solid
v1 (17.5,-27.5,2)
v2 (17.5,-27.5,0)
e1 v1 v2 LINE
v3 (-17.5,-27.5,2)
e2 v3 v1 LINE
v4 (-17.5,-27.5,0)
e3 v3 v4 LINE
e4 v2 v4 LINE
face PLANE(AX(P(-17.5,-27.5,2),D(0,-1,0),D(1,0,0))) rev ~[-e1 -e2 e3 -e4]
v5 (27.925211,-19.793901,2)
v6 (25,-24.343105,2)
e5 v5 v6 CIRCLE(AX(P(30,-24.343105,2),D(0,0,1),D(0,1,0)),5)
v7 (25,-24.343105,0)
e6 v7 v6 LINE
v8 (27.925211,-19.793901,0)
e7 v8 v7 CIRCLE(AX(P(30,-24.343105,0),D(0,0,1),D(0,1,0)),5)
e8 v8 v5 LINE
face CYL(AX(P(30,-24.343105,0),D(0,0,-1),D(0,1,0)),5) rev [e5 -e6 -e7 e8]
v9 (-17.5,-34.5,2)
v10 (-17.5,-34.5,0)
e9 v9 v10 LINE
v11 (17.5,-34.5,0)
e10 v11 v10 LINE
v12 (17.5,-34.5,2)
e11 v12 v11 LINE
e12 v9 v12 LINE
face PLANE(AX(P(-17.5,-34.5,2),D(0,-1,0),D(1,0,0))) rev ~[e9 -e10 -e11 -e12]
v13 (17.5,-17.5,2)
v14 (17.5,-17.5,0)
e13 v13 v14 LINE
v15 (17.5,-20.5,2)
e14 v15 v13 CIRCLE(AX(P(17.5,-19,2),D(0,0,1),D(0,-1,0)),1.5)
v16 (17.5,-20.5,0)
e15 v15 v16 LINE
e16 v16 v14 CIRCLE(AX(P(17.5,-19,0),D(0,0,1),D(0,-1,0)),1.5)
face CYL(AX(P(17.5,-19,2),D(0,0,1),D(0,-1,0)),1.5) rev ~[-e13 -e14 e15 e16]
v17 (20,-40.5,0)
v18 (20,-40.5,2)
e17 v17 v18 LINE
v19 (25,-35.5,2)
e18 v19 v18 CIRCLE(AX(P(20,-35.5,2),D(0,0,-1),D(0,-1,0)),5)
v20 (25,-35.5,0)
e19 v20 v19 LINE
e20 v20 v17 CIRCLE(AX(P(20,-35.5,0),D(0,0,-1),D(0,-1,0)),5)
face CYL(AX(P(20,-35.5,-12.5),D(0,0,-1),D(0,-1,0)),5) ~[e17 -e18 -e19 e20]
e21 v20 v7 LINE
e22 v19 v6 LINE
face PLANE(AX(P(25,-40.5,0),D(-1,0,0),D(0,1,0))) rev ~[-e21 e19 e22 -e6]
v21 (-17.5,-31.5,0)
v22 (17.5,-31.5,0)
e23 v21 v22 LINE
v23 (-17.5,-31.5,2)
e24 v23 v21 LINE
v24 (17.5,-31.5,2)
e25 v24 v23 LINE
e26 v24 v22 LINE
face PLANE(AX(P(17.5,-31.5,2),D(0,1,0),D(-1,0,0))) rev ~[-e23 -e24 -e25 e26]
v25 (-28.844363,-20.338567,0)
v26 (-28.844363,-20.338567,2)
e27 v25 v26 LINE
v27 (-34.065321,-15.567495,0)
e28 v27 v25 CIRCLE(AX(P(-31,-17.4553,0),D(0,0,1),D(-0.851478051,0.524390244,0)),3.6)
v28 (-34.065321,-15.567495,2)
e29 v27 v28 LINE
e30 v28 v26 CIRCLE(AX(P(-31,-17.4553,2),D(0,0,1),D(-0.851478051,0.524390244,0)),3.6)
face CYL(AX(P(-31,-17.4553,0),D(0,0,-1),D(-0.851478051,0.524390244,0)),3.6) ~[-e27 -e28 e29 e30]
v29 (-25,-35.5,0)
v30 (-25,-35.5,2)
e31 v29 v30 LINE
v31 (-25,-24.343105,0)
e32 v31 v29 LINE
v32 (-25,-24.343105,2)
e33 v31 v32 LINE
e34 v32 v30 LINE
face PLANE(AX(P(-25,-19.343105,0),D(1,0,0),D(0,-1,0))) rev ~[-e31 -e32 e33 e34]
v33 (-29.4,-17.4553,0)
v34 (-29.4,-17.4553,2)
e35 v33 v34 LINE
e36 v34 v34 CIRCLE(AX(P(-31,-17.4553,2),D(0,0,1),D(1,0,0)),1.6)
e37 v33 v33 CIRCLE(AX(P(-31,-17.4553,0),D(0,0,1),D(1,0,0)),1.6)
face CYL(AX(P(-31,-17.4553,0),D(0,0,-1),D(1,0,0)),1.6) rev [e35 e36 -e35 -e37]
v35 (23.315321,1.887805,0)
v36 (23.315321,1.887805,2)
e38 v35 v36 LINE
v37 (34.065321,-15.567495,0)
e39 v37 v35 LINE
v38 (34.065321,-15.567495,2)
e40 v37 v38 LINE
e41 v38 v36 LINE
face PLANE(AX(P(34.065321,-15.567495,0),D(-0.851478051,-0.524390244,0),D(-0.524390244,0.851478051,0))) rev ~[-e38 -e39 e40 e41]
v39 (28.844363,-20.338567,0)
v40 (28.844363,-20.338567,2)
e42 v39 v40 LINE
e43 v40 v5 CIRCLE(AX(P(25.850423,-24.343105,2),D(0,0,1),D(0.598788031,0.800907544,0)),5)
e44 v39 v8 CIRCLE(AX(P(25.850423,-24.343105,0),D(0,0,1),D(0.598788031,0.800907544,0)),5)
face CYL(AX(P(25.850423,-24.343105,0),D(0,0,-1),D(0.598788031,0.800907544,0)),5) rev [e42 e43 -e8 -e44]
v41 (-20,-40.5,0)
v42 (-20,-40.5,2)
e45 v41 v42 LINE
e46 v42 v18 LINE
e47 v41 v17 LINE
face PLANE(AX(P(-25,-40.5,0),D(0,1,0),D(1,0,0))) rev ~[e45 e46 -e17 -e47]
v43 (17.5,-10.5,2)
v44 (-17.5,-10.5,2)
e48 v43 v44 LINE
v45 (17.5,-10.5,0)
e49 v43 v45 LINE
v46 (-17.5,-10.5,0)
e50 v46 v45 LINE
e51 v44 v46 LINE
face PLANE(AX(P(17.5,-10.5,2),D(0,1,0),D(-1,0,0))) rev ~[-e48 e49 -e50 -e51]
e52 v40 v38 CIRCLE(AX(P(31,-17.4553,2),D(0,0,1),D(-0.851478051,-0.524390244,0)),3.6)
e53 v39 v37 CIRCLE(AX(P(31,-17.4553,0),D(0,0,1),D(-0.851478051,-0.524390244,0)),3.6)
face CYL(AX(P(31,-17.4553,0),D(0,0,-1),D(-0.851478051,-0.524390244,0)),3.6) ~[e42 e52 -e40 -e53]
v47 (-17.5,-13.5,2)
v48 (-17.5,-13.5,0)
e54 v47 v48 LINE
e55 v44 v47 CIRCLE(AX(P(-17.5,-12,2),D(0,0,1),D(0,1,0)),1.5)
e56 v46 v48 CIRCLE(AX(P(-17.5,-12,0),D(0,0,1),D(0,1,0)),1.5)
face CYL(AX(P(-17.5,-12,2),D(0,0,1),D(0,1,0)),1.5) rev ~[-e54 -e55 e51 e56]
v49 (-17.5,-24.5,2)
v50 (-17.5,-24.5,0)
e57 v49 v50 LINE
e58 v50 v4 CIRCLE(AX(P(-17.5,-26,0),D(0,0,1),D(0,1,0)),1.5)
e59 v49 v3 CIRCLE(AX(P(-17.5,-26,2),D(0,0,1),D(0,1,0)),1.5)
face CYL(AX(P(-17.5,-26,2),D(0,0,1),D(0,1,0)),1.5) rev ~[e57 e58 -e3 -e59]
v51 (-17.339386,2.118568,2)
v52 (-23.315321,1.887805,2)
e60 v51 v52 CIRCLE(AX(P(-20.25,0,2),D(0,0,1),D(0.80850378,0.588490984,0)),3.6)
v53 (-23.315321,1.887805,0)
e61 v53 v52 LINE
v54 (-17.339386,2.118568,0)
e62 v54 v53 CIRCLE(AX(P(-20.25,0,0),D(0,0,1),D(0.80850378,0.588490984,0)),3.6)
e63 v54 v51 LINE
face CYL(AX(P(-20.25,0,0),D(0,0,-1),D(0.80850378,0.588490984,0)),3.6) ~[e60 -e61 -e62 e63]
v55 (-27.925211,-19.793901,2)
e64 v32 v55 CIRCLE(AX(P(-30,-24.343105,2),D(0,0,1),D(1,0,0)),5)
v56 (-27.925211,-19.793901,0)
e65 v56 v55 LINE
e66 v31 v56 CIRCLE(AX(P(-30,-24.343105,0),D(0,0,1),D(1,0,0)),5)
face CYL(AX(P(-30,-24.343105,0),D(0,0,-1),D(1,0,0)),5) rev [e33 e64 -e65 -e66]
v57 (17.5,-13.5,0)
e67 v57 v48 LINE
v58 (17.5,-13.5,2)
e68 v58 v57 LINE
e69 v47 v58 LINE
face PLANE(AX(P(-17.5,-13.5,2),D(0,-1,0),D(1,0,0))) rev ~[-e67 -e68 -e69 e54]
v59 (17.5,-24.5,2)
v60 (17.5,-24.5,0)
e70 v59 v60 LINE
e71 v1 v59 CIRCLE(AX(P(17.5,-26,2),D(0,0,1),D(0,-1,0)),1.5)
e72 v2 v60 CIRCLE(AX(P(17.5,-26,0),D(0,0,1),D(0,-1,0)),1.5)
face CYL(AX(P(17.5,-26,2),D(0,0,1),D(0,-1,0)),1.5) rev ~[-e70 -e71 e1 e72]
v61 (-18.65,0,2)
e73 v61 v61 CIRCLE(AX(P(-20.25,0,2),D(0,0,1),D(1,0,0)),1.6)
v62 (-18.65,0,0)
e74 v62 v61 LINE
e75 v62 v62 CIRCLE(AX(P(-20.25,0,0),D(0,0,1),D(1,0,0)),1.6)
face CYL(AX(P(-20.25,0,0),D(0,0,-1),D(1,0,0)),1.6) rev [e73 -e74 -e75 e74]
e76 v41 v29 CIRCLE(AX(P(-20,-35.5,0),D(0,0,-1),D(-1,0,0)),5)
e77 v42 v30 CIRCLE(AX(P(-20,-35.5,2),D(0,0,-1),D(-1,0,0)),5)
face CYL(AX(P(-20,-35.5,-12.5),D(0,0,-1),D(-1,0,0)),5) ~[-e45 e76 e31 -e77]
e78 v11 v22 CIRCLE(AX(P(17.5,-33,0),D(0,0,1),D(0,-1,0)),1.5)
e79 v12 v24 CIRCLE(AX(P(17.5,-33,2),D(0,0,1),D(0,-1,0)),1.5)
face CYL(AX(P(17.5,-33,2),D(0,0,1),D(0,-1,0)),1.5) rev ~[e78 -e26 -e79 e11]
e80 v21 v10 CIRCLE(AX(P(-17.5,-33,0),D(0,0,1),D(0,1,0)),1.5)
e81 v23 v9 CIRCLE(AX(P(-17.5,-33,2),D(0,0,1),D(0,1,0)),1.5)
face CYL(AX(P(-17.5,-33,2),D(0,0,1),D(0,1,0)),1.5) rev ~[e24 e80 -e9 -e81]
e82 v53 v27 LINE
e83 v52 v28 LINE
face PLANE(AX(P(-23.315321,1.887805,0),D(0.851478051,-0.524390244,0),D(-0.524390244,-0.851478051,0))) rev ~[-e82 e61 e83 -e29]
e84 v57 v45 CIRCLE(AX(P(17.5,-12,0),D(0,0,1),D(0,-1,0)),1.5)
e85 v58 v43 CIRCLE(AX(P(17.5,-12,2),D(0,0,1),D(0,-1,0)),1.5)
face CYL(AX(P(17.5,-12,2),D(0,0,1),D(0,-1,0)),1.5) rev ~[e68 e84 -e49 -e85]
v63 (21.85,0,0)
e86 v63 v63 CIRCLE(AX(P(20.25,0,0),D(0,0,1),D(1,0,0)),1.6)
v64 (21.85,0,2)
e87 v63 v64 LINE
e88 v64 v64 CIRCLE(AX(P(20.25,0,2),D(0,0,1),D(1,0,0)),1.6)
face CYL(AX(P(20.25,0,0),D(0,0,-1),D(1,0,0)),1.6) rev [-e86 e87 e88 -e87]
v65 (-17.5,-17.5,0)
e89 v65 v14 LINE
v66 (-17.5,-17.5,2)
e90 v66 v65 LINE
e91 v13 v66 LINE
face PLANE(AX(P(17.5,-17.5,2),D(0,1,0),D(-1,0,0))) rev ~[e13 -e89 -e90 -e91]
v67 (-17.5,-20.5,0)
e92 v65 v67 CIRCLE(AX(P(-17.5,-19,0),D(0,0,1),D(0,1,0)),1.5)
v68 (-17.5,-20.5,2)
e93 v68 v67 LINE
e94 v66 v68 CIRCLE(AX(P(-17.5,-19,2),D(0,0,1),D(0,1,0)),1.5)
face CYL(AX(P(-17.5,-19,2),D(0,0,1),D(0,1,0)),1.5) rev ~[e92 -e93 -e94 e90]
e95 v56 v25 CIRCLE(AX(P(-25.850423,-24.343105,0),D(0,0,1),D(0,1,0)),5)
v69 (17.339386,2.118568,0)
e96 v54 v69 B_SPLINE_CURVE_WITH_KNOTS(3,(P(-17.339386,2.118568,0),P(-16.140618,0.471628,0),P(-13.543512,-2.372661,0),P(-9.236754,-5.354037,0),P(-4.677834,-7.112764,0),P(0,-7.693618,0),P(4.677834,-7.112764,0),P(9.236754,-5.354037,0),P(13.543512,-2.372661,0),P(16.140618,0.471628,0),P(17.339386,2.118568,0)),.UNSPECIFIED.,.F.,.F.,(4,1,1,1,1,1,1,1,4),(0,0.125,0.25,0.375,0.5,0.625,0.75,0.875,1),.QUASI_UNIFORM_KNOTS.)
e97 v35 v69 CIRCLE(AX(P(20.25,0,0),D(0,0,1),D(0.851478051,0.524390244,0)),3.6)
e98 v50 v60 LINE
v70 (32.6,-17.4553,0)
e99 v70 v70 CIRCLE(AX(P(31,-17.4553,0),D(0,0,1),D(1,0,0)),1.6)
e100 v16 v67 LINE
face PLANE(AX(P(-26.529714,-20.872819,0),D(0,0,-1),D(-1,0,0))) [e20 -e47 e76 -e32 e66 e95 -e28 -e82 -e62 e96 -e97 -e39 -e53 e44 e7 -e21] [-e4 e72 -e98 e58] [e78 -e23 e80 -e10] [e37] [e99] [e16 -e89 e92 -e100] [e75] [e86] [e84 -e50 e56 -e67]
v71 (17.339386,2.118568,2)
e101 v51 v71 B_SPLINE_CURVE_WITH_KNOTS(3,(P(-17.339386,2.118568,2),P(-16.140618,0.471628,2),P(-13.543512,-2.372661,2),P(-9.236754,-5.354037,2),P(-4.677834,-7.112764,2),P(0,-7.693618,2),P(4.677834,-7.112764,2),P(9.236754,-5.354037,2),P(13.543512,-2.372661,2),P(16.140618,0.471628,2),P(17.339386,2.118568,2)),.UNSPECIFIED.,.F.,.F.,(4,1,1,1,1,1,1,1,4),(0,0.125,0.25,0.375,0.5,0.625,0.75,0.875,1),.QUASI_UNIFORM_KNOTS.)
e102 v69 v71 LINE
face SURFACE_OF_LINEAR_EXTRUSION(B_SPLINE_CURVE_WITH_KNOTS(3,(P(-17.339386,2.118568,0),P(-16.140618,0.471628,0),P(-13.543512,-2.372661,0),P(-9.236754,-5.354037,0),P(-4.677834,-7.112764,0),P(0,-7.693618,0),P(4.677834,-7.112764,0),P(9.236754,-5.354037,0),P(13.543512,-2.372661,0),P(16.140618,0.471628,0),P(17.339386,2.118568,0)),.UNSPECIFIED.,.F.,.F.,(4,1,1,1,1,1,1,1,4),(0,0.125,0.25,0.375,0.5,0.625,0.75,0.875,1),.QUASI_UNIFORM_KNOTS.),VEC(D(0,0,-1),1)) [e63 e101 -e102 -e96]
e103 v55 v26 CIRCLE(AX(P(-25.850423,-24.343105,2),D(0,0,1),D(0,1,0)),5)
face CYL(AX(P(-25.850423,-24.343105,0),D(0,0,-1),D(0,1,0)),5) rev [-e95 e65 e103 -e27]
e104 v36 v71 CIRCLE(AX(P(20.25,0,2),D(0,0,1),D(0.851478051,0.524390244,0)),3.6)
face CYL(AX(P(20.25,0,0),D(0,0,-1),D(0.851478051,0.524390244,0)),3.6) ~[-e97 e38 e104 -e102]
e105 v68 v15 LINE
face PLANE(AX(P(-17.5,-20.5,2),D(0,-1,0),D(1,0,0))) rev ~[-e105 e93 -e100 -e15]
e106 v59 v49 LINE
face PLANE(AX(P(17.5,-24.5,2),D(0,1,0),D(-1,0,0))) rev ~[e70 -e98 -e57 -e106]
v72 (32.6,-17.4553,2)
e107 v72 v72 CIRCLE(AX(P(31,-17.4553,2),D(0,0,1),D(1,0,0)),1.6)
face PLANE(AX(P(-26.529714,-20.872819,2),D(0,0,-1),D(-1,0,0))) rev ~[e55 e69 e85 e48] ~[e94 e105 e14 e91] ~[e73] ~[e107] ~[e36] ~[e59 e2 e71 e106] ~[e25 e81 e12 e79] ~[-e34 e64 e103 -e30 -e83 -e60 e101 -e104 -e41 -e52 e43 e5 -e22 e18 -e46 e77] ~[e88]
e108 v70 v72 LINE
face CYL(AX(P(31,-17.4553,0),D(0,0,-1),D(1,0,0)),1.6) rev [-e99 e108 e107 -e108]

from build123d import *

# Parameters (mm, degrees)
F0_R        = 1.6
F1_DEPTH    = 2
F2_T1_DEPTH = 2
F2_T3_DEPTH = 27
F4_DEPTH    = 25


# Not quite as in the source:
# - a fillet or chamfer that OpenCascade refuses, or shapes differently, is made with other operations: its cross-section is extruded or revolved along the edge and cut away or added


with BuildPart() as f1:
    # F0 (on Top) → F1 (new body)
    with BuildSketch(Plane.XY):
        with BuildLine():
            add(Edge.make_bspline(
                [(-23.1606136078, -2.1185675411), (-22.1073400579, -3.5656171477), (-20.9766129337, -4.8945797394), (-19.7798663886, -6.1017373718)],
                knots=[0, 0, 0, 0, 0.0881031872, 0.0881031872, 0.0881031872, 0.0881031872], degree=3))
            ThreePointArc((-23.1606136078, -2.1185675411), (-23.8473189399, -0.1389116439), (-23.3153209852, 1.887804878))
            Line((-23.3153209852, 1.887804878), (-34.0653209852, -15.5674951767))
            ThreePointArc((-34.0653209852, -15.5674951767), (-32.887804878, -20.5206210399), (-27.9346790148, -19.3431049328))
            Line((-27.9346790148, -19.3431049328), (-19.7798663886, -6.1017373718))
        make_face()
        with Locations((-31, -17.4553000547)):
            Circle(F0_R, mode=Mode.SUBTRACT)
        with BuildLine():
            ThreePointArc((-23.3153209852, 1.887804878), (-23.8473189399, -0.1389116439), (-23.1606136078, -2.1185675411))
            add(Edge.make_bspline(
                [(-23.1606136078, -2.1185675411), (-22.1073400579, -3.5656171477), (-20.9766129337, -4.8945797394), (-19.7798663886, -6.1017373718)],
                knots=[0, 0, 0, 0, 0.0881031872, 0.0881031872, 0.0881031872, 0.0881031872], degree=3))
            Line((-19.7798663886, -6.1017373718), (-17.1846790148, -1.887804878))
            ThreePointArc((-17.1846790148, -1.887804878), (-16.6526810601, 0.1389116439), (-17.3393863922, 2.1185675411))
            ThreePointArc((-17.3393863922, 2.1185675411), (-20.3889116439, 3.5973189399), (-23.3153209852, 1.887804878))
        make_face()
        with Locations((-20.25, 0)):
            Circle(F0_R, mode=Mode.SUBTRACT)
        with BuildLine():
            Line((-17.1846790148, -1.887804878), (-19.7798663886, -6.1017373718))
            add(Edge.make_bspline(
                [(-19.7798663886, -6.1017373718), (-19.2786798287, -6.6072840002), (-17.0287540912, -8.7317983569), (-12.6752714432, -11.7584634521), (-6.4699511651, -14.1622363484), (0, -14.9688818258), (6.4699511651, -14.1622363484), (12.6752714432, -11.7584634521), (17.0287540912, -8.7317983569), (19.2786798287, -6.6072840002), (19.7798663886, -6.1017373718)],
                knots=[0.0881031872, 0.0881031872, 0.0881031872, 0.0881031872, 0.125, 0.25, 0.375, 0.5, 0.625, 0.75, 0.875, 0.9118968128, 0.9118968128, 0.9118968128, 0.9118968128], degree=3))
            Line((19.7798663886, -6.1017373718), (17.1846790148, -1.887804878))
            ThreePointArc((17.1846790148, -1.887804878), (16.6526810601, 0.1389116439), (17.3393863922, 2.1185675411))
            add(Edge.make_bspline(
                [(-17.3393863922, 2.1185675411), (-16.1406178919, 0.4716283513), (-13.5435115335, -2.372660701), (-9.2367539572, -5.3540365479), (-4.6778336966, -7.1127636516), (0, -7.6936181742), (4.6778336966, -7.1127636516), (9.2367539572, -5.3540365479), (13.5435115335, -2.372660701), (16.1406178919, 0.4716283513), (17.3393863922, 2.1185675411)],
                knots=[0, 0, 0, 0, 0.125, 0.25, 0.375, 0.5, 0.625, 0.75, 0.875, 1, 1, 1, 1], degree=3))
            ThreePointArc((-17.3393863922, 2.1185675411), (-16.6526810601, 0.1389116439), (-17.1846790148, -1.887804878))
        make_face()
        with BuildLine():
            add(Edge.make_bspline(
                [(-19.7798663886, -6.1017373718), (-19.2786798287, -6.6072840002), (-17.0287540912, -8.7317983569), (-12.6752714432, -11.7584634521), (-6.4699511651, -14.1622363484), (0, -14.9688818258), (6.4699511651, -14.1622363484), (12.6752714432, -11.7584634521), (17.0287540912, -8.7317983569), (19.2786798287, -6.6072840002), (19.7798663886, -6.1017373718)],
                knots=[0.0881031872, 0.0881031872, 0.0881031872, 0.0881031872, 0.125, 0.25, 0.375, 0.5, 0.625, 0.75, 0.875, 0.9118968128, 0.9118968128, 0.9118968128, 0.9118968128], degree=3))
            Line((-19.7798663886, -6.1017373718), (-27.9346790148, -19.3431049328))
            Line((-27.9346790148, -19.3431049328), (-25, -19.3431049328))
            Line((-25, -19.3431049328), (-25, -40.5))
            Line((-25, -40.5), (0, -40.5))
            Line((0, -40.5), (25, -40.5))
            Line((25, -40.5), (25, -19.3431049328))
            Line((25, -19.3431049328), (27.9346790148, -19.3431049328))
            Line((27.9346790148, -19.3431049328), (19.7798663886, -6.1017373718))
        make_face()
        with BuildLine():
            Line((17.1846790148, -1.887804878), (19.7798663886, -6.1017373718))
            add(Edge.make_bspline(
                [(19.7798663886, -6.1017373718), (20.9766129337, -4.8945797394), (22.1073400579, -3.5656171477), (23.1606136078, -2.1185675411)],
                knots=[0.9118968128, 0.9118968128, 0.9118968128, 0.9118968128, 1, 1, 1, 1], degree=3))
            ThreePointArc((23.1606136078, -2.1185675411), (23.8473189399, -0.1389116439), (23.3153209852, 1.887804878))
            ThreePointArc((23.3153209852, 1.887804878), (20.3889116439, 3.5973189399), (17.3393863922, 2.1185675411))
            ThreePointArc((17.3393863922, 2.1185675411), (16.6526810601, 0.1389116439), (17.1846790148, -1.887804878))
        make_face()
        with Locations((20.25, 0)):
            Circle(F0_R, mode=Mode.SUBTRACT)
        with BuildLine():
            add(Edge.make_bspline(
                [(19.7798663886, -6.1017373718), (20.9766129337, -4.8945797394), (22.1073400579, -3.5656171477), (23.1606136078, -2.1185675411)],
                knots=[0.9118968128, 0.9118968128, 0.9118968128, 0.9118968128, 1, 1, 1, 1], degree=3))
            Line((19.7798663886, -6.1017373718), (27.9346790148, -19.3431049328))
            ThreePointArc((27.9346790148, -19.3431049328), (32.887804878, -20.5206210399), (34.0653209852, -15.5674951767))
            Line((34.0653209852, -15.5674951767), (23.3153209852, 1.887804878))
            ThreePointArc((23.3153209852, 1.887804878), (23.8473189399, -0.1389116439), (23.1606136078, -2.1185675411))
        make_face()
        with Locations((31, -17.4553000547)):
            Circle(F0_R, mode=Mode.SUBTRACT)
    extrude(amount=F1_DEPTH)

    # F2: fillet of radius 5 on 6 edges, made by hand

    # F2_s2 → F2_t1 (join)
    with BuildSketch(Plane.XY):
        with BuildLine():
            ThreePointArc((-25, -24.3431049328), (-26.4644660941, -20.8075710268), (-30, -19.3431049328))
            Line((-30, -19.3431049328), (-25, -19.3431049328))
            Line((-25, -19.3431049328), (-25, -24.3431049328))
        make_face()
        with BuildLine():
            ThreePointArc((-25.8504229337, -19.3431049328), (-27.4279703024, -19.598492799), (-28.8443630885, -20.338567213))
            ThreePointArc((-28.8443630885, -20.338567213), (-28.3424942846, -19.8838105802), (-27.9346790148, -19.3431049328))
            Line((-27.9346790148, -19.3431049328), (-25.8504229337, -19.3431049328))
        make_face()
        with BuildLine():
            ThreePointArc((30, -19.3431049328), (26.4644660941, -20.8075710268), (25, -24.3431049328))
            Line((25, -24.3431049328), (25, -19.3431049328))
            Line((25, -19.3431049328), (30, -19.3431049328))
        make_face()
        with BuildLine():
            ThreePointArc((28.8443630885, -20.338567213), (27.4279703024, -19.598492799), (25.8504229337, -19.3431049328))
            Line((25.8504229337, -19.3431049328), (27.9346790148, -19.3431049328))
            ThreePointArc((27.9346790148, -19.3431049328), (28.3424942846, -19.8838105802), (28.8443630885, -20.338567213))
        make_face()
    extrude(amount=F2_T1_DEPTH)

    # F2_s4 → F2_t3 (cut)
    with BuildSketch(Plane.XY.offset(-12.5)):
        with BuildLine():
            ThreePointArc((-25, -35.5), (-23.5355339059, -39.0355339059), (-20, -40.5))
            Line((-20, -40.5), (-25, -40.5))
            Line((-25, -40.5), (-25, -35.5))
        make_face()
        with BuildLine():
            ThreePointArc((20, -40.5), (23.5355339059, -39.0355339059), (25, -35.5))
            Line((25, -35.5), (25, -40.5))
            Line((25, -40.5), (20, -40.5))
        make_face()
    extrude(amount=F2_T3_DEPTH, mode=Mode.SUBTRACT)

    # F3 (on face) → F4 (cut)
    with BuildSketch(Plane.XY.offset(2)):
        with BuildLine():
            ThreePointArc((-17.5, -10.5), (-19, -12), (-17.5, -13.5))
            Line((-17.5, -13.5), (17.5, -13.5))
            ThreePointArc((17.5, -13.5), (19, -12), (17.5, -10.5))
            Line((17.5, -10.5), (-17.5, -10.5))
        make_face()
        with BuildLine():
            ThreePointArc((-17.5, -17.5), (-19, -19), (-17.5, -20.5))
            Line((-17.5, -20.5), (17.5, -20.5))
            ThreePointArc((17.5, -20.5), (19, -19), (17.5, -17.5))
            Line((17.5, -17.5), (-17.5, -17.5))
        make_face()
        with BuildLine():
            ThreePointArc((-17.5, -24.5), (-19, -26), (-17.5, -27.5))
            Line((-17.5, -27.5), (17.5, -27.5))
            ThreePointArc((17.5, -27.5), (19, -26), (17.5, -24.5))
            Line((17.5, -24.5), (-17.5, -24.5))
        make_face()
        with BuildLine():
            ThreePointArc((-17.5, -31.5), (-19, -33), (-17.5, -34.5))
            Line((-17.5, -34.5), (17.5, -34.5))
            ThreePointArc((17.5, -34.5), (19, -33), (17.5, -31.5))
            Line((17.5, -31.5), (-17.5, -31.5))
        make_face()
    extrude(amount=-F4_DEPTH, mode=Mode.SUBTRACT)


solid = f1.part
